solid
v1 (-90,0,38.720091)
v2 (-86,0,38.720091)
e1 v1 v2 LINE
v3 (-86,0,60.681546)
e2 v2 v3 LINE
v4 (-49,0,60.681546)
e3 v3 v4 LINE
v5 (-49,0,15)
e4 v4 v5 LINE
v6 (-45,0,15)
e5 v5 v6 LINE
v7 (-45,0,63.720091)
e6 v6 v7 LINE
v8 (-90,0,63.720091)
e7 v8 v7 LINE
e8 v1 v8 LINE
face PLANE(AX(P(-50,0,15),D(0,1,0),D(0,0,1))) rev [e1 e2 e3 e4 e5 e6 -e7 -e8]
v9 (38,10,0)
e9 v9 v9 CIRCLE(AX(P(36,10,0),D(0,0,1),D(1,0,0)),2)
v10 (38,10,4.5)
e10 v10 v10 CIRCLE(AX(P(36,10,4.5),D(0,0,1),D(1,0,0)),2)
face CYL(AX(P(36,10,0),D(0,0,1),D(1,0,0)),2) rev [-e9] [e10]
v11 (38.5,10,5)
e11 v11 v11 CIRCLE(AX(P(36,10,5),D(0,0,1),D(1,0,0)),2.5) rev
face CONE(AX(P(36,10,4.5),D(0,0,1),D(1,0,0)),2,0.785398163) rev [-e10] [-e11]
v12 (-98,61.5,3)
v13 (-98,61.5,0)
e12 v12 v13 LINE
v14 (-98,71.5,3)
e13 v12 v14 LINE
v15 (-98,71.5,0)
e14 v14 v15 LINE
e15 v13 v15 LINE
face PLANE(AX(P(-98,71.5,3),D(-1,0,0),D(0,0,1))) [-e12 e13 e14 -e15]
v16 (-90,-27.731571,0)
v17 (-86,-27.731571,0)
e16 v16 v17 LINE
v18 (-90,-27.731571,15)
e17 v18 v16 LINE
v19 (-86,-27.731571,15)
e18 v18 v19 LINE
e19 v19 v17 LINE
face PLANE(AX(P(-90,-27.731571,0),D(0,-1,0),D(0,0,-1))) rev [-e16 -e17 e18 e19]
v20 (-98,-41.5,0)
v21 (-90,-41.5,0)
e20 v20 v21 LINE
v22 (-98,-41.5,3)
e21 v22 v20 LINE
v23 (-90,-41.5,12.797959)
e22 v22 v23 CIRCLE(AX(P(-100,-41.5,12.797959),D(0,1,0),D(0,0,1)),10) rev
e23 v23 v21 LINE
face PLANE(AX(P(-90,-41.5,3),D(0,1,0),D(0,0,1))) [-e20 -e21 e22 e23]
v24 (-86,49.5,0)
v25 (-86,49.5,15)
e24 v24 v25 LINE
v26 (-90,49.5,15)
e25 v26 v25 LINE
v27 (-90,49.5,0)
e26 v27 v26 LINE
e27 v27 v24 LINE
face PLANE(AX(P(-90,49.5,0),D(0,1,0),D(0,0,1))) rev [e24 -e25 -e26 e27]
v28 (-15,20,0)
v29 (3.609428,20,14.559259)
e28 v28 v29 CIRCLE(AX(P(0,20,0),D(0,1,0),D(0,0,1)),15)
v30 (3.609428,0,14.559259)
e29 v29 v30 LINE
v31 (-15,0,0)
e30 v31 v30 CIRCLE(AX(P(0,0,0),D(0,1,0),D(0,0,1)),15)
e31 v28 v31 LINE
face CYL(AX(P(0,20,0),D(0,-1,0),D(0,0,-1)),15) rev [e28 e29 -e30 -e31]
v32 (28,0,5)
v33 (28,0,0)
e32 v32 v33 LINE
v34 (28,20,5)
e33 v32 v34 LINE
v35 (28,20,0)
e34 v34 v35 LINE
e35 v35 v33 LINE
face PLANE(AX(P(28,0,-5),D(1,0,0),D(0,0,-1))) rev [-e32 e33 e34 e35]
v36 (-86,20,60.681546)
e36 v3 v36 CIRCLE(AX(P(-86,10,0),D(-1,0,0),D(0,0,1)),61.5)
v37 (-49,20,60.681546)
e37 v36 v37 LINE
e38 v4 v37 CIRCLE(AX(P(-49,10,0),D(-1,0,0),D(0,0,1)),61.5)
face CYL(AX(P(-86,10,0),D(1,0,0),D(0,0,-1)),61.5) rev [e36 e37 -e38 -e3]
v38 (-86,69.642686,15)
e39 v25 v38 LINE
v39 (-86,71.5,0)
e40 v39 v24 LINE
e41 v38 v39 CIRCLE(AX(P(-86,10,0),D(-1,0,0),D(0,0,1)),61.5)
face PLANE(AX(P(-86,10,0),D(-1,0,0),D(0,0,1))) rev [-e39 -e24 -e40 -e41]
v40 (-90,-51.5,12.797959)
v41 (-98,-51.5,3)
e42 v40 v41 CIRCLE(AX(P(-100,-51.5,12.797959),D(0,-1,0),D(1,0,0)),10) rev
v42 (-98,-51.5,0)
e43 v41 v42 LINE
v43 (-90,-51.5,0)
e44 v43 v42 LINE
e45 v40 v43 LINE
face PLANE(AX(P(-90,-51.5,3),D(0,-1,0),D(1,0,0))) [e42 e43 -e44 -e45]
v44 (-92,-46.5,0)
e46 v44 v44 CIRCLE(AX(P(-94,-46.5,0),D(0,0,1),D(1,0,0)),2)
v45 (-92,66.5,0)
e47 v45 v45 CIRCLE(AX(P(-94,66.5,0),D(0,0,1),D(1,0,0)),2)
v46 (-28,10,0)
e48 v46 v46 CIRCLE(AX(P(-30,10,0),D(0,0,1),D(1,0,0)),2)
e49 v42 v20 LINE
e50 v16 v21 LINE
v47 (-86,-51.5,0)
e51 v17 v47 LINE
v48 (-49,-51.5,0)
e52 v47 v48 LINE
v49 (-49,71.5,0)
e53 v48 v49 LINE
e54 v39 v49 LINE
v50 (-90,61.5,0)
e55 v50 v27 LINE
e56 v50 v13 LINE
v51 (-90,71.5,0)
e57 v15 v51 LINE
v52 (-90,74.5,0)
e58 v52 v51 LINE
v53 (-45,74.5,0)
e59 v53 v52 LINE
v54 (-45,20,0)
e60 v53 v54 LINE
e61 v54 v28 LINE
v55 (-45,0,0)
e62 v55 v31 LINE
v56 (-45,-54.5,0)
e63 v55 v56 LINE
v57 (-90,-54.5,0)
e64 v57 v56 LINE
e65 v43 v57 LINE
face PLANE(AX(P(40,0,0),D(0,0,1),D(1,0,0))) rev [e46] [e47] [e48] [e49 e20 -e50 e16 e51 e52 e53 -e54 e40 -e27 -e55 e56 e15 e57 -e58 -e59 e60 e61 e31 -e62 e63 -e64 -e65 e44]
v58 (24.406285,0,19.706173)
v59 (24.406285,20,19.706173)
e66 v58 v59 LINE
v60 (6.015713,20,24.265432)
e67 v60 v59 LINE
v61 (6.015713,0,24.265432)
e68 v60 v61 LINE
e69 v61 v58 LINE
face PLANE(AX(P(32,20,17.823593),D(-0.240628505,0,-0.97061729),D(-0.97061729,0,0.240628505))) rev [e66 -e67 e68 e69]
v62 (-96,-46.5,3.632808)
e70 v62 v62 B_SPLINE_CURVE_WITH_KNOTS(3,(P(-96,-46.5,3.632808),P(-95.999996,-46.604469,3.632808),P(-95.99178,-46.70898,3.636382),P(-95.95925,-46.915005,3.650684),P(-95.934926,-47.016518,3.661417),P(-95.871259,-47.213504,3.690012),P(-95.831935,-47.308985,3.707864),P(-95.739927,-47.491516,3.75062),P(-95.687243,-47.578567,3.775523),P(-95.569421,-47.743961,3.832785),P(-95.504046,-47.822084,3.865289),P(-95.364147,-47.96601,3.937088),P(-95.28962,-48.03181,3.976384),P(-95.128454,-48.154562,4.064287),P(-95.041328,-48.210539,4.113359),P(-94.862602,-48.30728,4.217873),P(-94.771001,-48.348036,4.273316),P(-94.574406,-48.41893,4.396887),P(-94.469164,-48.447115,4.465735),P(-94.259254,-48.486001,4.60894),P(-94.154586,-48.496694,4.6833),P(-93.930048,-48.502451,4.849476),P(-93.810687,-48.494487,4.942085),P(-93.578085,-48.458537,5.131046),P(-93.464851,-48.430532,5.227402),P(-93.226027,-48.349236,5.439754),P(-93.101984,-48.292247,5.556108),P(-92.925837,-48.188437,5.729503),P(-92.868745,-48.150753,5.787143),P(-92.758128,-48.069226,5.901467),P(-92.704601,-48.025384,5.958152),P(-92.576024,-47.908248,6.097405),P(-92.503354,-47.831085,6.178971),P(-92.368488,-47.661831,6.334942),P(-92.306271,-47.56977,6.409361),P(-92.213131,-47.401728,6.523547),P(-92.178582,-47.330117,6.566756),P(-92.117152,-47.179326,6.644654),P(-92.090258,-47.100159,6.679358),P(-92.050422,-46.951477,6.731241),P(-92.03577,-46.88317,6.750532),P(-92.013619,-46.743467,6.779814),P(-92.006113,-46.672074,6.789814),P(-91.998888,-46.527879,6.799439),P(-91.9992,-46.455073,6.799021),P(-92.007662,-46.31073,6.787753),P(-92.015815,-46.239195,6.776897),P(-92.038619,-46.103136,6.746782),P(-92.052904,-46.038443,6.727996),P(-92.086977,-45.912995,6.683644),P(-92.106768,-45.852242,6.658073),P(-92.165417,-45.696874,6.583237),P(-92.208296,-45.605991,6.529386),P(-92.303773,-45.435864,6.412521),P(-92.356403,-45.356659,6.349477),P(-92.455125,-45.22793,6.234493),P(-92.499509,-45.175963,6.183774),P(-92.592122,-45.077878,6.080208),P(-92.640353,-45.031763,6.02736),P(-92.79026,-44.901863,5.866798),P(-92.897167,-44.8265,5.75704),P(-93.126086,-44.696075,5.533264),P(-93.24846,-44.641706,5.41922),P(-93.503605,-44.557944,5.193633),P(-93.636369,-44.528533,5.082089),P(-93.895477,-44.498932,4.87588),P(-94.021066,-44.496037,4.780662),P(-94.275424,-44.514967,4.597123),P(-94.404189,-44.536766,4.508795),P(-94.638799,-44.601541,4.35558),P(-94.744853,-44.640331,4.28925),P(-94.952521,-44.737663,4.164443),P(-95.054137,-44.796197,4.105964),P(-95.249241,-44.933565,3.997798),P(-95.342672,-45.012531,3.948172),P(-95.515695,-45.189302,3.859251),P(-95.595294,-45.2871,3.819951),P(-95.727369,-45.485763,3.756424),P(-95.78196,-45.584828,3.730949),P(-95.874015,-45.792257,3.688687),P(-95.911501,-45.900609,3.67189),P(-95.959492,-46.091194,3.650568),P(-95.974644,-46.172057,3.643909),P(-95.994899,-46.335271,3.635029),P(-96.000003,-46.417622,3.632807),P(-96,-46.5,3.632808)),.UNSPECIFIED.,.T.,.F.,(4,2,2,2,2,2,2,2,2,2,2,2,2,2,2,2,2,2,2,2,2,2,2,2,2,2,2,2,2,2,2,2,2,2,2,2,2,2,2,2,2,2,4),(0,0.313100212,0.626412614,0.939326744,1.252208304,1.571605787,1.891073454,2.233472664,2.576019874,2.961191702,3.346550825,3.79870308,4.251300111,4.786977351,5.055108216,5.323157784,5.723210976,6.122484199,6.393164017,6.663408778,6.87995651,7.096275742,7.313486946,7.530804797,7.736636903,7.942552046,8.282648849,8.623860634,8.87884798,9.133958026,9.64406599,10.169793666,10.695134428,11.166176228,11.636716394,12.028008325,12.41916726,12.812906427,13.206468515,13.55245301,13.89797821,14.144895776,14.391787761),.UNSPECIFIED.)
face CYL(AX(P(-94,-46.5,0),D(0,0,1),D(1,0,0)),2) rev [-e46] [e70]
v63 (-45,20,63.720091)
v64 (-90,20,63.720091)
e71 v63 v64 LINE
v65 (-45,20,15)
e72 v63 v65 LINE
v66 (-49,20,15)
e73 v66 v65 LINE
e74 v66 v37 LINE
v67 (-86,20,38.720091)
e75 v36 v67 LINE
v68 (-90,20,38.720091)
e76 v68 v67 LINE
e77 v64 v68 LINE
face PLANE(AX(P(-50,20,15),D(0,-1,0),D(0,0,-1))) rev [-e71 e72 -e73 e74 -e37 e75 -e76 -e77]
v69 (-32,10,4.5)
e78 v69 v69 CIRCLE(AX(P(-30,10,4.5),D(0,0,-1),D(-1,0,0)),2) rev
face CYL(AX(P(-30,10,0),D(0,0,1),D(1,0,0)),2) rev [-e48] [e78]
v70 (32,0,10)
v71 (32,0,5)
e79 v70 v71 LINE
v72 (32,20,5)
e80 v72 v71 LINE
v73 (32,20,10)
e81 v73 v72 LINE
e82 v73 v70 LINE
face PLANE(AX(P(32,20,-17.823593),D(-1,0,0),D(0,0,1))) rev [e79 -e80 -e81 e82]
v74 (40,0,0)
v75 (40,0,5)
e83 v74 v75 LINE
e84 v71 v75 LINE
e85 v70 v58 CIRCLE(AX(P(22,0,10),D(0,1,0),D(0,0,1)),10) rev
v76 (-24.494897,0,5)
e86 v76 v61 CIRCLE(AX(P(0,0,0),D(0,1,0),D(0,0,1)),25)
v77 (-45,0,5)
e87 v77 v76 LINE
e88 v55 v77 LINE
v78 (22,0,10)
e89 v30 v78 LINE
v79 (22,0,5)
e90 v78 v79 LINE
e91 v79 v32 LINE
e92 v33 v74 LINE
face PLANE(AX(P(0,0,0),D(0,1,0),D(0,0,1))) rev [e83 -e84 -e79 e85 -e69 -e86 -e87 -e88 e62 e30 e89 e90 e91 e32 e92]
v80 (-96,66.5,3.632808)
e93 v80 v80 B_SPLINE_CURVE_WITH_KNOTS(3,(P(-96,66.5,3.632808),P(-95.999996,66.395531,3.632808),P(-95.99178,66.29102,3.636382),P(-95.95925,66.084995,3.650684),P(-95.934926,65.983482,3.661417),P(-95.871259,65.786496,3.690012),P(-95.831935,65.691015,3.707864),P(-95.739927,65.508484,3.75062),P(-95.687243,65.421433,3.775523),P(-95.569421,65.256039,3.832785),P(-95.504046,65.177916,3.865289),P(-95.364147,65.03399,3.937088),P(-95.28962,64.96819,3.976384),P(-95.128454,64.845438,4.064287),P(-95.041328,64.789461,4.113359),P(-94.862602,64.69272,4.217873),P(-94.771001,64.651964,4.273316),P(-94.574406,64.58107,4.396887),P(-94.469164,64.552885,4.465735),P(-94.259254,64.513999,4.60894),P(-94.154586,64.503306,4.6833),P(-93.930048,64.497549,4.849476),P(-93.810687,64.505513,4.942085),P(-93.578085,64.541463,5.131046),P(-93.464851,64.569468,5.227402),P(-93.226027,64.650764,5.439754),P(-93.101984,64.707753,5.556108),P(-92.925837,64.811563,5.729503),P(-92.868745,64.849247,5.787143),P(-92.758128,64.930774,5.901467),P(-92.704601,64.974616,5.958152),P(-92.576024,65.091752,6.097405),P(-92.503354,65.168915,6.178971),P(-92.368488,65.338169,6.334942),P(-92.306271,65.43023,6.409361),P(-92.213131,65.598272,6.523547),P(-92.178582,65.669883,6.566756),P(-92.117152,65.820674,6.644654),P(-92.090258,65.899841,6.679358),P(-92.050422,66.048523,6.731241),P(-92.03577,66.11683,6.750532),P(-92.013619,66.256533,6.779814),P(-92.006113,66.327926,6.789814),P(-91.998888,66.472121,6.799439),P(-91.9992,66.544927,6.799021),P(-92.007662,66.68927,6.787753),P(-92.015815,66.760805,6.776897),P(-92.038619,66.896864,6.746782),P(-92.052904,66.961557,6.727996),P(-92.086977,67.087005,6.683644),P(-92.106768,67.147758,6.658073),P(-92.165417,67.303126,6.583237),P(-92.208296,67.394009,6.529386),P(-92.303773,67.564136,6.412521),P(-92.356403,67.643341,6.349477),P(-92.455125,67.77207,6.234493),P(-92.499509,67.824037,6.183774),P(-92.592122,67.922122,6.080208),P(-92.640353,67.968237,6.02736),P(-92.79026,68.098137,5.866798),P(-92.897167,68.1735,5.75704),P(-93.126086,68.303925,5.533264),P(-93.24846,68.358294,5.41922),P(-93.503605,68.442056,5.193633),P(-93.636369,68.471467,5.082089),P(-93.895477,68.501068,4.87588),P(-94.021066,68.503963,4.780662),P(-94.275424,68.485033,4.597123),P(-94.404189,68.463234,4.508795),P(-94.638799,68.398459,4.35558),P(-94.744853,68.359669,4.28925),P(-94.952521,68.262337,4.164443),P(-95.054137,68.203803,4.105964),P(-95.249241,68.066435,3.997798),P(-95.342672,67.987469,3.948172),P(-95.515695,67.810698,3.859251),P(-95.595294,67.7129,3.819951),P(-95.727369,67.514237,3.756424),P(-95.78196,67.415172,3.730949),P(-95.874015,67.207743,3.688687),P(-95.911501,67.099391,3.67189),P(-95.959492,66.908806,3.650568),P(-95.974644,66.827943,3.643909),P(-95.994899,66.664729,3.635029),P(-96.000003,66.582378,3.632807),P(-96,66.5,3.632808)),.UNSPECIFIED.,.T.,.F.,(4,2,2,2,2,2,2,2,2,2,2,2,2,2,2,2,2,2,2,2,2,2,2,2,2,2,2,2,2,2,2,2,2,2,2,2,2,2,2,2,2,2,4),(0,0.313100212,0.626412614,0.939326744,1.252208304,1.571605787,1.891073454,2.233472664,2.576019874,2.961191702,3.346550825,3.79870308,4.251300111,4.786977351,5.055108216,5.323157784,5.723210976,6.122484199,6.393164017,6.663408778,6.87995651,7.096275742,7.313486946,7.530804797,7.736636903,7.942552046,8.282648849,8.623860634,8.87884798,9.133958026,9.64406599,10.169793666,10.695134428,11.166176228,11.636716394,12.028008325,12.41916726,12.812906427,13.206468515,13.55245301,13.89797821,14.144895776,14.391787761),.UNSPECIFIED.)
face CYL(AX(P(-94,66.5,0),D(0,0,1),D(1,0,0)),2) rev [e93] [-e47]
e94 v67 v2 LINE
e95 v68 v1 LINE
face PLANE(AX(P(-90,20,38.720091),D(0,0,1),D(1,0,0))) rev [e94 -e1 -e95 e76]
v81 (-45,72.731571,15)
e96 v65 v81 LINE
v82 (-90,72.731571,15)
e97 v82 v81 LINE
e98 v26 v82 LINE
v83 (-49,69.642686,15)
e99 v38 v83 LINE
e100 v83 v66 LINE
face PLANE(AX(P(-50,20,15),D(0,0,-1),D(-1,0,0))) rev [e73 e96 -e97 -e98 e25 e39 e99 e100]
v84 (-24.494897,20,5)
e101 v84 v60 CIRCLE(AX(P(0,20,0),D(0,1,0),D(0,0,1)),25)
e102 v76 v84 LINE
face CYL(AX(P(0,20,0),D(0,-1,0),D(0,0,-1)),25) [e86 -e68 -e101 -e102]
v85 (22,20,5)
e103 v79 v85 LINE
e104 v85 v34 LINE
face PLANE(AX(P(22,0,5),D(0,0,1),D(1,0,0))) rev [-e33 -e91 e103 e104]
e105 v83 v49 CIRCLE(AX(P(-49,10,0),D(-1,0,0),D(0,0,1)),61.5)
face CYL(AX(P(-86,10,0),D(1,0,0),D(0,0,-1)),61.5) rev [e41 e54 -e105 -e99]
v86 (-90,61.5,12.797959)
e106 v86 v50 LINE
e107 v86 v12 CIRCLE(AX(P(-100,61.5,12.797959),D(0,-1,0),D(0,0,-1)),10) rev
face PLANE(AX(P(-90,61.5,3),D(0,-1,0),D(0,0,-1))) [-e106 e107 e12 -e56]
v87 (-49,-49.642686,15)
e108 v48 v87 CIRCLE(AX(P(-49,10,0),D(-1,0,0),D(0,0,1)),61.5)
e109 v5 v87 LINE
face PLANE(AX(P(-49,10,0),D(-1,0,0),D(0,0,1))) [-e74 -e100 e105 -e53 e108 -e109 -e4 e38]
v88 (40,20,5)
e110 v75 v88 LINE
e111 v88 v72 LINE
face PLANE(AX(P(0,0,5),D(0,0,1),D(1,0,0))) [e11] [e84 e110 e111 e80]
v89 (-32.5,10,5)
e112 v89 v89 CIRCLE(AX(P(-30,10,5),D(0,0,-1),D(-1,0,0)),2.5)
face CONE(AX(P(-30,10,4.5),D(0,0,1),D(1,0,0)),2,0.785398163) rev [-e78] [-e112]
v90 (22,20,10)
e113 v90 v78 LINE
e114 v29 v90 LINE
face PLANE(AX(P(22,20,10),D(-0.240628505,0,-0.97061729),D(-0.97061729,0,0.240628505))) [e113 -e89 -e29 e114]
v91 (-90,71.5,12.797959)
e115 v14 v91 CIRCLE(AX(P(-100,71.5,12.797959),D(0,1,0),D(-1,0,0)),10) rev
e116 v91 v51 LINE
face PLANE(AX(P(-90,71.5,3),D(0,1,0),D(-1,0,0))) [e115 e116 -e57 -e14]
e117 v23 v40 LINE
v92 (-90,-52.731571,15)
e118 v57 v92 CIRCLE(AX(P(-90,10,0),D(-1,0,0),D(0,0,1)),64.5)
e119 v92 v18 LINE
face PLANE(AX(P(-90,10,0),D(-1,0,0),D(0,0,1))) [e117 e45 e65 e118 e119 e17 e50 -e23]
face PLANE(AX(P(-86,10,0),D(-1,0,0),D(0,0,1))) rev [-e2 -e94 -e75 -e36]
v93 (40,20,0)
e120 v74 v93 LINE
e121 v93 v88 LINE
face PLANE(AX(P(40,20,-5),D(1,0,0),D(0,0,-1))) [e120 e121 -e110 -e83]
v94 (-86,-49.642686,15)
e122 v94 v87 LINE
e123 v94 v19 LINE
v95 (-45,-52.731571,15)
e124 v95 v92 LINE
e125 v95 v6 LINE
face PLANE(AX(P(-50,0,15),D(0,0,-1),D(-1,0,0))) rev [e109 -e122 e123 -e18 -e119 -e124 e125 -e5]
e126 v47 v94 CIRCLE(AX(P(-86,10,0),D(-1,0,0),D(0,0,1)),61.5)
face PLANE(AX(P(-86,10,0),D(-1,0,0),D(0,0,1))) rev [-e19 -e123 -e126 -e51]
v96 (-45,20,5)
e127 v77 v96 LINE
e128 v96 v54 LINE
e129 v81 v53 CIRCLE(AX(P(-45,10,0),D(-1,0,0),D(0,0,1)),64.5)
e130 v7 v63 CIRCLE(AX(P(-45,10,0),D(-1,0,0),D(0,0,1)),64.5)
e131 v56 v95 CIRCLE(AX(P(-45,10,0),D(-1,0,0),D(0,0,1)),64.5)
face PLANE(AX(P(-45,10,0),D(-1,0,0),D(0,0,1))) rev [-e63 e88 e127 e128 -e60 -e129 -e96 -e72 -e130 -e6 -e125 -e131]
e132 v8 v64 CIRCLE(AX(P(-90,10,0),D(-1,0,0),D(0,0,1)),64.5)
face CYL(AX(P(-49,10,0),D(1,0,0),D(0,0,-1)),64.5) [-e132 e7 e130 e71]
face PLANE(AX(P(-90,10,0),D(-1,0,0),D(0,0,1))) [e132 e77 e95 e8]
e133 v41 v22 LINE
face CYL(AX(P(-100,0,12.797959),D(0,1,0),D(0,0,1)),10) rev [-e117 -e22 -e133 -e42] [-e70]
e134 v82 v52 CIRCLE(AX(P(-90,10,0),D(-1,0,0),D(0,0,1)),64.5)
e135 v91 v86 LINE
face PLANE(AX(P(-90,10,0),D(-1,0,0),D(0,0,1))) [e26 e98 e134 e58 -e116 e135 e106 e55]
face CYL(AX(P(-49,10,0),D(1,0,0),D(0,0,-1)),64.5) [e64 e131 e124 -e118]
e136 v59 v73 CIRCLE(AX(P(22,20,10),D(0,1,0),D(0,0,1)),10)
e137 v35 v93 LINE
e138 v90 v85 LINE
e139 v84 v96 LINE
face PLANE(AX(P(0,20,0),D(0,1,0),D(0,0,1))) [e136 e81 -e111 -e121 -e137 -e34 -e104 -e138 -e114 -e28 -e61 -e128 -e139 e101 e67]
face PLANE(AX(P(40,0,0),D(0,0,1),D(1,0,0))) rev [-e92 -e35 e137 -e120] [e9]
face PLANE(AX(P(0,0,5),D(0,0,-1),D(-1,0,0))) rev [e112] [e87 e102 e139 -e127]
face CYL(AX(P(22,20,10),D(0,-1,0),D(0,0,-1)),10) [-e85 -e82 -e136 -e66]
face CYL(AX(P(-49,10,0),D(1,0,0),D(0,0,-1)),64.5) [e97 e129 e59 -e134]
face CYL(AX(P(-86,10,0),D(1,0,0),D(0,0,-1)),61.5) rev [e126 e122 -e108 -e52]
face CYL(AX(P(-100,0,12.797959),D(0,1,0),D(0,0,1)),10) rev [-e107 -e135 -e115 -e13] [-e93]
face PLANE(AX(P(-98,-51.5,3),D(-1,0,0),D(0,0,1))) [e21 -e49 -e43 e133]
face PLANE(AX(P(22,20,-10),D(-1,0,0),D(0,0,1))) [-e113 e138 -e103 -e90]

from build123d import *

# Parameters (mm, degrees)
EXTRUDE_1_DEPTH          = 20
SKETCH_2_W               = 6
SKETCH_2_H               = 10
CUT_EXTRUDE_1_DEPTH      = 20
EXTRUDE_2_DEPTH          = 5
EXTRUDE_2_DEPTH_BACK     = 5
SKETCH_3_W               = 8
SKETCH_3_H               = 20
EXTRUDE_3_DEPTH          = 5
EXTRUDE_3_DEPTH_BACK     = 5
SKETCH_4_W               = 20
SKETCH_4_H               = 20
CUT_EXTRUDE_2_DEPTH      = 52.23475383
CUT_EXTRUDE_2_DEPTH_BACK = 52.23475383
SKETCH_5_W               = 80.386179801
SKETCH_5_H               = 26.605581219
SKETCH_6_R               = 2
CUT_EXTRUDE_3_DEPTH      = 49.989794856
CHAMFER_1_SIZE           = 0.5
FILLET_1_R               = 10
SKETCH_7_W               = 5
SKETCH_7_H               = 20
EXTRUDE_4_DEPTH          = 10
SKETCH_8_R               = 64.5
EXTRUDE_5_DEPTH          = 4
SKETCH_9_W               = 60
SKETCH_9_H               = 60
SKETCH_9_W_2             = 85.907763787
SKETCH_9_H_2             = 140
CUT_EXTRUDE_4_DEPTH      = 5
EXTRUDE_8_DEPTH          = 37
EXTRUDE_9_DEPTH          = 4
SKETCH_15_W              = 8
SKETCH_15_H              = 10
EXTRUDE_10_DEPTH         = 3
SKETCH_16_R              = 2
CUT_EXTRUDE_5_DEPTH      = 3
FILLET_START             = -51.5
FILLET_2_DEPTH           = 2.999999733
FILLET_START_2           = 61.5
FILLET_2_2_DEPTH         = 2.999999733
FILLET_START_3           = -44.499993891
FILLET_2_3_DEPTH         = 2.999993891
FILLET_START_4           = 68.500006109
FILLET_2_4_DEPTH         = 2.999993891
FILLET_START_5           = -48.500000267
FILLET_2_5_DEPTH         = 4.000006376
FILLET_START_6           = 64.499999733
FILLET_2_6_DEPTH         = 4.000006376
FILLET_START_7           = 3
FILLET_2_7_OUTLINE_R     = 2
FILLET_2_7_DEPTH         = 3.797947653


with BuildPart() as part:
    # 草图1 → 凸台-拉伸1 (new body)
    with BuildSketch(Plane(origin=(0, 0, 0), x_dir=(1, 0, 0), z_dir=(0, 1, 0))):
        with BuildLine():
            Line((32, 17.82359333), (32, -17.82359333))
            Line((32, -17.82359333), (6.015712619, -24.265432238))
            ThreePointArc((6.015712619, -24.265432238), (-25, 0), (6.015712619, 24.265432238))
            Line((6.015712619, 24.265432238), (32, 17.82359333))
        make_face()
        with BuildLine():
            Line((22, 10), (22, -10))
            Line((22, -10), (3.609427572, -14.559259343))
            ThreePointArc((3.609427572, -14.559259343), (-15, 0), (3.609427572, 14.559259343))
            Line((3.609427572, 14.559259343), (22, 10))
        make_face(mode=Mode.SUBTRACT)
    extrude(amount=EXTRUDE_1_DEPTH)

    # 草图2 → 切除-拉伸1 (cut)
    with BuildSketch(Plane(origin=(0, 20, 0), x_dir=(1, 0, 0), z_dir=(0, 1, 0))):
        with Locations((25, 0)):
            Rectangle(SKETCH_2_W, SKETCH_2_H)
    extrude(amount=-CUT_EXTRUDE_1_DEPTH, mode=Mode.SUBTRACT)

    # 草图3 → 凸台-拉伸2 (add, two sides: drawn at the far end of the back side and taken through both)
    with BuildSketch(Plane.XY.offset(-EXTRUDE_2_DEPTH_BACK)):
        with Locations((36, 10)):
            Rectangle(SKETCH_3_W, SKETCH_3_H)
    extrude(amount=EXTRUDE_2_DEPTH + EXTRUDE_2_DEPTH_BACK)

    # 草图4 → 凸台-拉伸3 (add, two sides: drawn at the far end of the back side and taken through both)
    with BuildSketch(Plane.XY.offset(-EXTRUDE_3_DEPTH_BACK)):
        with Locations((-25, 10)):
            Rectangle(SKETCH_4_W, SKETCH_4_H)
    extrude(amount=EXTRUDE_3_DEPTH + EXTRUDE_3_DEPTH_BACK)

    # 草图5 → 切除-拉伸2 (cut, two sides: drawn at the far end of the back side and taken through both)
    with BuildSketch(Plane(origin=(0, 20, 0), x_dir=(1, 0, 0), z_dir=(0, 1, 0)).offset(-CUT_EXTRUDE_2_DEPTH_BACK)):
        with Locations((-0.193089901, 13.30279061)):
            Rectangle(SKETCH_5_W, SKETCH_5_H)
    extrude(amount=CUT_EXTRUDE_2_DEPTH + CUT_EXTRUDE_2_DEPTH_BACK, mode=Mode.SUBTRACT)

    # 草图6 → 切除-拉伸3 (cut, through all)
    with BuildSketch(Plane.XY.offset(5)):
        with Locations((-30, 10)):
            Circle(SKETCH_6_R)
        with Locations((36, 10)):
            Circle(SKETCH_6_R)
    extrude(amount=-CUT_EXTRUDE_3_DEPTH, mode=Mode.SUBTRACT)

    # 倒角1
    chamfer_1_edges = [part.edges().sort_by_distance(p)[0] for p in [
        (-32, 10, 5),
        (34, 10, 5),
    ]]
    chamfer(chamfer_1_edges, length=CHAMFER_1_SIZE)

    # 圆角1
    fillet_1_edges = [part.edges().sort_by_distance(p)[0] for p in [
        (32, 10, 17.82359333),
    ]]
    fillet(fillet_1_edges, radius=FILLET_1_R)

    # 草图7 → 凸台-拉伸4 (add)
    with BuildSketch(Plane.ZY.offset(35)):
        with Locations((2.5, 10)):
            Rectangle(SKETCH_7_W, SKETCH_7_H)
    extrude(amount=EXTRUDE_4_DEPTH)

    # 草图8 → 凸台-拉伸5 (add)
    with BuildSketch(Plane.ZY.offset(45)):
        with Locations((0, 10)):
            Circle(SKETCH_8_R)
    extrude(amount=EXTRUDE_5_DEPTH)

    # 草图9 → 切除-拉伸4 (cut)
    with BuildSketch(Plane(origin=(-45, 0, 0), x_dir=(0, 0, -1), z_dir=(1, 0, 0))):
        with Locations((-45, 50)):
            Rectangle(SKETCH_9_W, SKETCH_9_H)
        with Locations((-45, -30)):
            Rectangle(SKETCH_9_W, SKETCH_9_H)
        with Locations((42.953881894, 10)):
            Rectangle(SKETCH_9_W_2, SKETCH_9_H_2)
    extrude(amount=-CUT_EXTRUDE_4_DEPTH, mode=Mode.SUBTRACT)

    # 草图11 → 凸台-拉伸8 (add)
    with BuildSketch(Plane.ZY.offset(49)):
        with BuildLine():
            ThreePointArc((60.681545794, 20), (61.5, 10), (60.681545794, 0))
            Line((60.681545794, 0), (63.720091023, 0))
            ThreePointArc((63.720091023, 0), (64.5, 10), (63.720091023, 20))
            Line((63.720091023, 20), (60.681545794, 20))
        make_face()
        with BuildLine():
            Line((0, 74.5), (0, 71.5))
            ThreePointArc((0, 71.5), (7.557274891, 71.0339053), (15, 69.642686056))
            Line((15, 69.642686056), (15, 72.731570999))
            ThreePointArc((15, 72.731570999), (7.551942484, 74.05636709), (0, 74.5))
        make_face()
        with BuildLine():
            ThreePointArc((15, -49.642686056), (7.557274891, -51.0339053), (0, -51.5))
            Line((0, -51.5), (0, -54.5))
            ThreePointArc((0, -54.5), (7.551942484, -54.05636709), (15, -52.731570999))
            Line((15, -52.731570999), (15, -49.642686056))
        make_face()
    extrude(amount=EXTRUDE_8_DEPTH)

    # 草图13 → 凸台-拉伸9 (add)
    with BuildSketch(Plane.ZY.offset(86)):
        with BuildLine():
            Line((63.720091023, 20), (38.720091023, 20))
            Line((38.720091023, 20), (38.720091023, 0))
            Line((38.720091023, 0), (63.720091023, 0))
            ThreePointArc((63.720091023, 0), (64.5, 10), (63.720091023, 20))
        make_face()
        with BuildLine():
            Line((0, -54.5), (0, -27.731570999))
            Line((0, -27.731570999), (15, -27.731570999))
            Line((15, -27.731570999), (15, -52.731570999))
            ThreePointArc((15, -52.731570999), (7.551942484, -54.05636709), (0, -54.5))
        make_face()
        with BuildLine():
            Line((0, 74.5), (0, 49.5))
            Line((0, 49.5), (15, 49.5))
            Line((15, 49.5), (15, 72.731570999))
            ThreePointArc((15, 72.731570999), (7.551942484, 74.05636709), (0, 74.5))
        make_face()
    extrude(amount=EXTRUDE_9_DEPTH)

    # 草图15 → 凸台-拉伸10 (add)
    with BuildSketch(Plane(origin=(0, 0, 0), x_dir=(-1, 0, 0), z_dir=(0, 0, -1))):
        with Locations((94, 66.5)):
            Rectangle(SKETCH_15_W, SKETCH_15_H)
        with Locations((94, -46.5)):
            Rectangle(SKETCH_15_W, SKETCH_15_H)
    extrude(amount=-EXTRUDE_10_DEPTH)

    # 草图16 → 切除-拉伸5 (cut)
    with BuildSketch(Plane.XY.offset(3)):
        with Locations((-94, 66.5)):
            Circle(SKETCH_16_R)
        with Locations((-94, -46.5)):
            Circle(SKETCH_16_R)
    extrude(amount=-CUT_EXTRUDE_5_DEPTH, mode=Mode.SUBTRACT)

    # 圆角2: read off the stored shape, not the designer's step
    # 圆角2 outline → 圆角2 (add)
    with BuildSketch(Plane(origin=(0, 0, 0), x_dir=(1, 0, 0), z_dir=(0, 1, 0)).offset(FILLET_START)):
        with BuildLine():
            ThreePointArc((-98, -3), (-92.254033308, -6.473403651), (-90, -12.797958971))
            Line((-90, -12.797958971), (-90, -3))
            Line((-90, -3), (-98, -3))
        make_face()
    extrude(amount=FILLET_2_DEPTH)

    # Fillet 2 2 outline → Fillet 2 2 (add)
    with BuildSketch(Plane(origin=(0, 0, 0), x_dir=(1, 0, 0), z_dir=(0, 1, 0)).offset(FILLET_START_2)):
        with BuildLine():
            ThreePointArc((-98, -3), (-92.254033308, -6.473403651), (-90, -12.797958971))
            Line((-90, -12.797958971), (-90, -3))
            Line((-90, -3), (-98, -3))
        make_face()
    extrude(amount=FILLET_2_2_DEPTH)

    # Fillet 2 3 outline → Fillet 2 3 (add)
    with BuildSketch(Plane(origin=(0, 0, 0), x_dir=(1, 0, 0), z_dir=(0, 1, 0)).offset(FILLET_START_3)):
        with BuildLine():
            ThreePointArc((-98, -3), (-92.254033308, -6.473403651), (-90, -12.797958971))
            Line((-90, -12.797958971), (-90, -3))
            Line((-90, -3), (-98, -3))
        make_face()
    extrude(amount=FILLET_2_3_DEPTH)

    # Fillet 2 4 outline → Fillet 2 4 (add)
    with BuildSketch(Plane(origin=(0, 0, 0), x_dir=(1, 0, 0), z_dir=(0, 1, 0)).offset(FILLET_START_4)):
        with BuildLine():
            ThreePointArc((-98, -3), (-92.254033308, -6.473403651), (-90, -12.797958971))
            Line((-90, -12.797958971), (-90, -3))
            Line((-90, -3), (-98, -3))
        make_face()
    extrude(amount=FILLET_2_4_DEPTH)

    # Fillet 2 5 outline → Fillet 2 5 (add)
    with BuildSketch(Plane(origin=(0, 0, 0), x_dir=(1, 0, 0), z_dir=(0, 1, 0)).offset(FILLET_START_5)):
        with BuildLine():
            ThreePointArc((-98, -3), (-92.254033308, -6.473403651), (-90, -12.797958971))
            Line((-90, -12.797958971), (-90, -3))
            Line((-90, -3), (-98, -3))
        make_face()
    extrude(amount=FILLET_2_5_DEPTH)

    # Fillet 2 6 outline → Fillet 2 6 (add)
    with BuildSketch(Plane(origin=(0, 0, 0), x_dir=(1, 0, 0), z_dir=(0, 1, 0)).offset(FILLET_START_6)):
        with BuildLine():
            ThreePointArc((-98, -3), (-92.254033308, -6.473403651), (-90, -12.797958971))
            Line((-90, -12.797958971), (-90, -3))
            Line((-90, -3), (-98, -3))
        make_face()
    extrude(amount=FILLET_2_6_DEPTH)

    # Fillet 2 7 outline → Fillet 2 7 (cut)
    with BuildSketch(Plane.XY.offset(FILLET_START_7)):
        with Locations((-94, 66.5)):
            Circle(FILLET_2_7_OUTLINE_R)
        with Locations((-94, -46.5)):
            Circle(FILLET_2_7_OUTLINE_R)
    extrude(amount=FILLET_2_7_DEPTH, mode=Mode.SUBTRACT)


solid = part.part
